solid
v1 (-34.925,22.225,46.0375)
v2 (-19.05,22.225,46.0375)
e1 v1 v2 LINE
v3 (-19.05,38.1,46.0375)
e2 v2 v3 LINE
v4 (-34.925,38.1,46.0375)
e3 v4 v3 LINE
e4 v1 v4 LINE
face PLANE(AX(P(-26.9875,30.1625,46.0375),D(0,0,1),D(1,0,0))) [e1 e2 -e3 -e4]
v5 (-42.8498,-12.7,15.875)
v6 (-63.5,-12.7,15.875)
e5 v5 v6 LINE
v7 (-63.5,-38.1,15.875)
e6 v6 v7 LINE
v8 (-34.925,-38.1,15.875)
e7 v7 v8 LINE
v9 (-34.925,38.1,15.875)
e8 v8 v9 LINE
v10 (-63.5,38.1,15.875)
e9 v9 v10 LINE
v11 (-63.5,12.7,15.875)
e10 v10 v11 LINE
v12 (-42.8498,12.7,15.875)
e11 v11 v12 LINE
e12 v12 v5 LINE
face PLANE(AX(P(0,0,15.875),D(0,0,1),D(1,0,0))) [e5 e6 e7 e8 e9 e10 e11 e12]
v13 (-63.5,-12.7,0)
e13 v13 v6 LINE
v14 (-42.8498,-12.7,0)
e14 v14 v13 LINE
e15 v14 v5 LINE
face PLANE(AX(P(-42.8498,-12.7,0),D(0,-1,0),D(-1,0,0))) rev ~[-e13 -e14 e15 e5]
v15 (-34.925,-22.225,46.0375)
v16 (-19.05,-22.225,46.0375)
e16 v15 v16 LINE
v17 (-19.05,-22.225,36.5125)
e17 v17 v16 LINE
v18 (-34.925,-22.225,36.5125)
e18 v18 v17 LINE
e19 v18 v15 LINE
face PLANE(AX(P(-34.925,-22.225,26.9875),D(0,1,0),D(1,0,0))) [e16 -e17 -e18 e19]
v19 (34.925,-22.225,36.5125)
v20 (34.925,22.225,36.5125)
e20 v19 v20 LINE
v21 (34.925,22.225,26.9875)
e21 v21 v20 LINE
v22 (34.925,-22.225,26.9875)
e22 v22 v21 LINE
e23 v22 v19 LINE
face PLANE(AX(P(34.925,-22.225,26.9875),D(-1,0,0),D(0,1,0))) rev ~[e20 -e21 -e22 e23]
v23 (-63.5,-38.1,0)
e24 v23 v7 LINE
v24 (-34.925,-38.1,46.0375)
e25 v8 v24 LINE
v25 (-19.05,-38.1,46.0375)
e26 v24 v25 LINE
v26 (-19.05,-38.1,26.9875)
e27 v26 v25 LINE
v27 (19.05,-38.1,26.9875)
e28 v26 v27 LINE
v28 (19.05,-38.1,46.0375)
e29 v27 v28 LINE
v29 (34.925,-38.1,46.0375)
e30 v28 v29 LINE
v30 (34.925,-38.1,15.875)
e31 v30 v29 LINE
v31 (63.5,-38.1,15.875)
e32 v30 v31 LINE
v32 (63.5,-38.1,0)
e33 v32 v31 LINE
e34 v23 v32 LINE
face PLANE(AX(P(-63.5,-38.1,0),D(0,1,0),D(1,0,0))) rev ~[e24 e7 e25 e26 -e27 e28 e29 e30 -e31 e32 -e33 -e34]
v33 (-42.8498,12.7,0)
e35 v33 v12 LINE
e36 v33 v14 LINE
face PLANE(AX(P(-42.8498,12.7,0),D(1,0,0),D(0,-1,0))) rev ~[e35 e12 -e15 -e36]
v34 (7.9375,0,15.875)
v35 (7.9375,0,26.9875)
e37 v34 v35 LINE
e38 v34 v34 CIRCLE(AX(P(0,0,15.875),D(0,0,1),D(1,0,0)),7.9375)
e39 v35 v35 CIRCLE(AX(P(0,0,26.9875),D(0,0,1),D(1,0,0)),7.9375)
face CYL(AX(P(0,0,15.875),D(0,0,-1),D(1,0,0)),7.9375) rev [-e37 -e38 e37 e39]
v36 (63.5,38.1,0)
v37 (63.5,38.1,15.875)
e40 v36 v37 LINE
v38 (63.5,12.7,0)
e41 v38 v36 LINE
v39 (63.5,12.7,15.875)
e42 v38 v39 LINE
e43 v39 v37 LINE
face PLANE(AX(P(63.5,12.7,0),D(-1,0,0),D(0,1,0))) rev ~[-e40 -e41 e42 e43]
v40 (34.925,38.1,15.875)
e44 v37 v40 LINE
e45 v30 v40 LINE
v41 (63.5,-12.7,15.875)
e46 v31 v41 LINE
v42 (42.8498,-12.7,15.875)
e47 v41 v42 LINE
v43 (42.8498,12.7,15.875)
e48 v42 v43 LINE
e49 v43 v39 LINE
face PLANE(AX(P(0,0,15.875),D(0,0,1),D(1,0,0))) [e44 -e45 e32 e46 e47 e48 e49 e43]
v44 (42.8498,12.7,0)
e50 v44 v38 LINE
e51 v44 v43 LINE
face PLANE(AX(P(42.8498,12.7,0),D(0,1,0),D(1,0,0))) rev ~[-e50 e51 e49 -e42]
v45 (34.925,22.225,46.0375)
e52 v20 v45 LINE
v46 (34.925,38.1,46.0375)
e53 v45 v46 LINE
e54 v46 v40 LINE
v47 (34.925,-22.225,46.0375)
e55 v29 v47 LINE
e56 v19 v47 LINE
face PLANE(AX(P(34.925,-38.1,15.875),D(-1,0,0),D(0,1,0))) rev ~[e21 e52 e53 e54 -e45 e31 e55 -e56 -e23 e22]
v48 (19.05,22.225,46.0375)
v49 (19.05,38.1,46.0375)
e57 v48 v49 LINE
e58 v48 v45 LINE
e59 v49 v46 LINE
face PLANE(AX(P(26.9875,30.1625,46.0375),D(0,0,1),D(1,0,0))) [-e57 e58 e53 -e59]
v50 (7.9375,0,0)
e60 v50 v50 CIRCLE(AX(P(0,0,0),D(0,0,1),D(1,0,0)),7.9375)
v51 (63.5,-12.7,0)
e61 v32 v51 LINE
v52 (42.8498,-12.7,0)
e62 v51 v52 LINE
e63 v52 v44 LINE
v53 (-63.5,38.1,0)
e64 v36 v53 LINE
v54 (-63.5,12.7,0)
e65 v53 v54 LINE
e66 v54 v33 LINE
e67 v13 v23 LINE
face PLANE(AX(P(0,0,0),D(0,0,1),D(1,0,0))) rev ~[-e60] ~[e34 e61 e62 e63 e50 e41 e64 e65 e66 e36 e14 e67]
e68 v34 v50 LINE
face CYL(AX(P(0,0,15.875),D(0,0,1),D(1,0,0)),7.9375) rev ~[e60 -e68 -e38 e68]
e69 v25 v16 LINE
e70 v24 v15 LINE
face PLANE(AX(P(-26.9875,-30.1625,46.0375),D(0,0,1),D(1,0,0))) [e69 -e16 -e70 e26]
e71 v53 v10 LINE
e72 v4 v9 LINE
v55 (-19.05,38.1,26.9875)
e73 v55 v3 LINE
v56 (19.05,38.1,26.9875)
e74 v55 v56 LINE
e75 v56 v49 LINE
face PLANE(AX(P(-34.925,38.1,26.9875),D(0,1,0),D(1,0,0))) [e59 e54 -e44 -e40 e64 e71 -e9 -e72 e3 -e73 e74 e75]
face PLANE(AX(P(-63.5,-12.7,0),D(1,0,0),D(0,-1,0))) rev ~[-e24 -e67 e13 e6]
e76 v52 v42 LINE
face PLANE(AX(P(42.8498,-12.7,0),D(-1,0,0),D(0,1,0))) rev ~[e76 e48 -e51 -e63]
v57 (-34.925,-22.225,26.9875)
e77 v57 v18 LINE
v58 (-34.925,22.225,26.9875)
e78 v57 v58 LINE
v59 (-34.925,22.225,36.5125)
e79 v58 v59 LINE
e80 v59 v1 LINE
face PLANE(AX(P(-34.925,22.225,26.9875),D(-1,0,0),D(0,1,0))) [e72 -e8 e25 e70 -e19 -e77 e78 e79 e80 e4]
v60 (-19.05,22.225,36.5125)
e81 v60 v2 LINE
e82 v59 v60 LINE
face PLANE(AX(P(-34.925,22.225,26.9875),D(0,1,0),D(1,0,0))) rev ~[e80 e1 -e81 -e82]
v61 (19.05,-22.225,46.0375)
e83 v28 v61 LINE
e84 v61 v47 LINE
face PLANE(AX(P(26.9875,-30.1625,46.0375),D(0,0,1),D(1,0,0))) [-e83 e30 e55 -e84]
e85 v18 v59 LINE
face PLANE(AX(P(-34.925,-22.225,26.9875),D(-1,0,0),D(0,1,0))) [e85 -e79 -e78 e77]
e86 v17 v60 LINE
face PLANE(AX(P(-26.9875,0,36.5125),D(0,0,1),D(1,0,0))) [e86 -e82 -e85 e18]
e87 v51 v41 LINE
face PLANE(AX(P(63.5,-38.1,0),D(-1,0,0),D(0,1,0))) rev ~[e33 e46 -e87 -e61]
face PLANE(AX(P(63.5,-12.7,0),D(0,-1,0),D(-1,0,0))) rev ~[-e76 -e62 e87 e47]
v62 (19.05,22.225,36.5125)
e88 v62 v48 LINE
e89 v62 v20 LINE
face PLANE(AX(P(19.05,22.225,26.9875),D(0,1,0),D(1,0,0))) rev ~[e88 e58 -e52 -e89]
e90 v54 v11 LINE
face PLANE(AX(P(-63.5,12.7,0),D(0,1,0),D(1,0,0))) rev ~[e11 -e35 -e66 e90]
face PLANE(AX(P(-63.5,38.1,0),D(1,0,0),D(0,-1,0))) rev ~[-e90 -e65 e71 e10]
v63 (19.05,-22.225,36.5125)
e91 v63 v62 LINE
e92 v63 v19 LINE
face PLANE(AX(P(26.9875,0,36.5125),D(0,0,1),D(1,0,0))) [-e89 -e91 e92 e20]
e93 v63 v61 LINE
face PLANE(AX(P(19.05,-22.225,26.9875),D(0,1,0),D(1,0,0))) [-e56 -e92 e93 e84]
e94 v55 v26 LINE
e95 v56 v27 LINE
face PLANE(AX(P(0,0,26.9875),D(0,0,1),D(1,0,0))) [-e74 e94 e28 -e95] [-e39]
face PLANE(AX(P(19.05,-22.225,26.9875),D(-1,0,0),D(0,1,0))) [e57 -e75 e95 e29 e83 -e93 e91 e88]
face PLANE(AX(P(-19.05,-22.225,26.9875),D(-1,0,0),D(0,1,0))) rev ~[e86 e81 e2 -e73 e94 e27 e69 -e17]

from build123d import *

# Parameters (mm, degrees)
F1_DEPTH = 15.875
F2_W     = 69.85
F2_H     = 76.2
F2_R     = 7.9375
F3_DEPTH = 11.1125
F4_DEPTH = 15.876
F5_W     = 15.875
F5_H     = 15.875
F6_DEPTH = 19.05
F7_W     = 15.875
F7_H     = 44.45
F8_DEPTH = 9.525


# Not quite as in the source:
# - a length typed as a fraction of an inch, garbled in the dataset ("3 / 203.2 mm" for 3/8 in), is restored


with BuildPart() as f1:
    # F0 (on Top) → F1 (new body)
    with BuildSketch(Plane.XY):
        Polygon((63.5, 12.7), (63.5, 38.1), (-63.5, 38.1), (-63.5, 12.7), (-42.8498, 12.7), (-42.8498, -12.7), (-63.5, -12.7), (-63.5, -38.1), (63.5, -38.1), (63.5, -12.7), (42.8498, -12.7), (42.8498, 12.7), align=None)
    extrude(amount=F1_DEPTH)

    # F2 (on face) → F3 (join)
    with BuildSketch(Plane.XY.offset(15.875)):
        Rectangle(F2_W, F2_H)
        Circle(F2_R, mode=Mode.SUBTRACT)
    extrude(amount=F3_DEPTH)

    # F4 (cut, through all): a face of the model
    f4_faces = [f1.faces().sort_by_distance(p)[0] for p in [
        (0, 0, 15.875),
    ]]
    extrude(f4_faces, amount=-F4_DEPTH, mode=Mode.SUBTRACT)

    # F5 (on face) → F6 (join)
    with BuildSketch(Plane.XY.offset(26.9875)):
        with Locations((-26.9875, 30.1625)):
            Rectangle(F5_W, F5_H)
        with Locations((26.9875, 30.1625)):
            Rectangle(F5_W, F5_H)
        with Locations((26.9875, -30.1625)):
            Rectangle(F5_W, F5_H)
        with Locations((-26.9875, -30.1625)):
            Rectangle(F5_W, F5_H)
    extrude(amount=F6_DEPTH)

    # F7 (on face) → F8 (join)
    with BuildSketch(Plane.XY.offset(26.9875)):
        with Locations((26.9875, 0)):
            Rectangle(F7_W, F7_H)
        with Locations((-26.9875, 0)):
            Rectangle(F7_W, F7_H)
    extrude(amount=F8_DEPTH)


solid = f1.part
